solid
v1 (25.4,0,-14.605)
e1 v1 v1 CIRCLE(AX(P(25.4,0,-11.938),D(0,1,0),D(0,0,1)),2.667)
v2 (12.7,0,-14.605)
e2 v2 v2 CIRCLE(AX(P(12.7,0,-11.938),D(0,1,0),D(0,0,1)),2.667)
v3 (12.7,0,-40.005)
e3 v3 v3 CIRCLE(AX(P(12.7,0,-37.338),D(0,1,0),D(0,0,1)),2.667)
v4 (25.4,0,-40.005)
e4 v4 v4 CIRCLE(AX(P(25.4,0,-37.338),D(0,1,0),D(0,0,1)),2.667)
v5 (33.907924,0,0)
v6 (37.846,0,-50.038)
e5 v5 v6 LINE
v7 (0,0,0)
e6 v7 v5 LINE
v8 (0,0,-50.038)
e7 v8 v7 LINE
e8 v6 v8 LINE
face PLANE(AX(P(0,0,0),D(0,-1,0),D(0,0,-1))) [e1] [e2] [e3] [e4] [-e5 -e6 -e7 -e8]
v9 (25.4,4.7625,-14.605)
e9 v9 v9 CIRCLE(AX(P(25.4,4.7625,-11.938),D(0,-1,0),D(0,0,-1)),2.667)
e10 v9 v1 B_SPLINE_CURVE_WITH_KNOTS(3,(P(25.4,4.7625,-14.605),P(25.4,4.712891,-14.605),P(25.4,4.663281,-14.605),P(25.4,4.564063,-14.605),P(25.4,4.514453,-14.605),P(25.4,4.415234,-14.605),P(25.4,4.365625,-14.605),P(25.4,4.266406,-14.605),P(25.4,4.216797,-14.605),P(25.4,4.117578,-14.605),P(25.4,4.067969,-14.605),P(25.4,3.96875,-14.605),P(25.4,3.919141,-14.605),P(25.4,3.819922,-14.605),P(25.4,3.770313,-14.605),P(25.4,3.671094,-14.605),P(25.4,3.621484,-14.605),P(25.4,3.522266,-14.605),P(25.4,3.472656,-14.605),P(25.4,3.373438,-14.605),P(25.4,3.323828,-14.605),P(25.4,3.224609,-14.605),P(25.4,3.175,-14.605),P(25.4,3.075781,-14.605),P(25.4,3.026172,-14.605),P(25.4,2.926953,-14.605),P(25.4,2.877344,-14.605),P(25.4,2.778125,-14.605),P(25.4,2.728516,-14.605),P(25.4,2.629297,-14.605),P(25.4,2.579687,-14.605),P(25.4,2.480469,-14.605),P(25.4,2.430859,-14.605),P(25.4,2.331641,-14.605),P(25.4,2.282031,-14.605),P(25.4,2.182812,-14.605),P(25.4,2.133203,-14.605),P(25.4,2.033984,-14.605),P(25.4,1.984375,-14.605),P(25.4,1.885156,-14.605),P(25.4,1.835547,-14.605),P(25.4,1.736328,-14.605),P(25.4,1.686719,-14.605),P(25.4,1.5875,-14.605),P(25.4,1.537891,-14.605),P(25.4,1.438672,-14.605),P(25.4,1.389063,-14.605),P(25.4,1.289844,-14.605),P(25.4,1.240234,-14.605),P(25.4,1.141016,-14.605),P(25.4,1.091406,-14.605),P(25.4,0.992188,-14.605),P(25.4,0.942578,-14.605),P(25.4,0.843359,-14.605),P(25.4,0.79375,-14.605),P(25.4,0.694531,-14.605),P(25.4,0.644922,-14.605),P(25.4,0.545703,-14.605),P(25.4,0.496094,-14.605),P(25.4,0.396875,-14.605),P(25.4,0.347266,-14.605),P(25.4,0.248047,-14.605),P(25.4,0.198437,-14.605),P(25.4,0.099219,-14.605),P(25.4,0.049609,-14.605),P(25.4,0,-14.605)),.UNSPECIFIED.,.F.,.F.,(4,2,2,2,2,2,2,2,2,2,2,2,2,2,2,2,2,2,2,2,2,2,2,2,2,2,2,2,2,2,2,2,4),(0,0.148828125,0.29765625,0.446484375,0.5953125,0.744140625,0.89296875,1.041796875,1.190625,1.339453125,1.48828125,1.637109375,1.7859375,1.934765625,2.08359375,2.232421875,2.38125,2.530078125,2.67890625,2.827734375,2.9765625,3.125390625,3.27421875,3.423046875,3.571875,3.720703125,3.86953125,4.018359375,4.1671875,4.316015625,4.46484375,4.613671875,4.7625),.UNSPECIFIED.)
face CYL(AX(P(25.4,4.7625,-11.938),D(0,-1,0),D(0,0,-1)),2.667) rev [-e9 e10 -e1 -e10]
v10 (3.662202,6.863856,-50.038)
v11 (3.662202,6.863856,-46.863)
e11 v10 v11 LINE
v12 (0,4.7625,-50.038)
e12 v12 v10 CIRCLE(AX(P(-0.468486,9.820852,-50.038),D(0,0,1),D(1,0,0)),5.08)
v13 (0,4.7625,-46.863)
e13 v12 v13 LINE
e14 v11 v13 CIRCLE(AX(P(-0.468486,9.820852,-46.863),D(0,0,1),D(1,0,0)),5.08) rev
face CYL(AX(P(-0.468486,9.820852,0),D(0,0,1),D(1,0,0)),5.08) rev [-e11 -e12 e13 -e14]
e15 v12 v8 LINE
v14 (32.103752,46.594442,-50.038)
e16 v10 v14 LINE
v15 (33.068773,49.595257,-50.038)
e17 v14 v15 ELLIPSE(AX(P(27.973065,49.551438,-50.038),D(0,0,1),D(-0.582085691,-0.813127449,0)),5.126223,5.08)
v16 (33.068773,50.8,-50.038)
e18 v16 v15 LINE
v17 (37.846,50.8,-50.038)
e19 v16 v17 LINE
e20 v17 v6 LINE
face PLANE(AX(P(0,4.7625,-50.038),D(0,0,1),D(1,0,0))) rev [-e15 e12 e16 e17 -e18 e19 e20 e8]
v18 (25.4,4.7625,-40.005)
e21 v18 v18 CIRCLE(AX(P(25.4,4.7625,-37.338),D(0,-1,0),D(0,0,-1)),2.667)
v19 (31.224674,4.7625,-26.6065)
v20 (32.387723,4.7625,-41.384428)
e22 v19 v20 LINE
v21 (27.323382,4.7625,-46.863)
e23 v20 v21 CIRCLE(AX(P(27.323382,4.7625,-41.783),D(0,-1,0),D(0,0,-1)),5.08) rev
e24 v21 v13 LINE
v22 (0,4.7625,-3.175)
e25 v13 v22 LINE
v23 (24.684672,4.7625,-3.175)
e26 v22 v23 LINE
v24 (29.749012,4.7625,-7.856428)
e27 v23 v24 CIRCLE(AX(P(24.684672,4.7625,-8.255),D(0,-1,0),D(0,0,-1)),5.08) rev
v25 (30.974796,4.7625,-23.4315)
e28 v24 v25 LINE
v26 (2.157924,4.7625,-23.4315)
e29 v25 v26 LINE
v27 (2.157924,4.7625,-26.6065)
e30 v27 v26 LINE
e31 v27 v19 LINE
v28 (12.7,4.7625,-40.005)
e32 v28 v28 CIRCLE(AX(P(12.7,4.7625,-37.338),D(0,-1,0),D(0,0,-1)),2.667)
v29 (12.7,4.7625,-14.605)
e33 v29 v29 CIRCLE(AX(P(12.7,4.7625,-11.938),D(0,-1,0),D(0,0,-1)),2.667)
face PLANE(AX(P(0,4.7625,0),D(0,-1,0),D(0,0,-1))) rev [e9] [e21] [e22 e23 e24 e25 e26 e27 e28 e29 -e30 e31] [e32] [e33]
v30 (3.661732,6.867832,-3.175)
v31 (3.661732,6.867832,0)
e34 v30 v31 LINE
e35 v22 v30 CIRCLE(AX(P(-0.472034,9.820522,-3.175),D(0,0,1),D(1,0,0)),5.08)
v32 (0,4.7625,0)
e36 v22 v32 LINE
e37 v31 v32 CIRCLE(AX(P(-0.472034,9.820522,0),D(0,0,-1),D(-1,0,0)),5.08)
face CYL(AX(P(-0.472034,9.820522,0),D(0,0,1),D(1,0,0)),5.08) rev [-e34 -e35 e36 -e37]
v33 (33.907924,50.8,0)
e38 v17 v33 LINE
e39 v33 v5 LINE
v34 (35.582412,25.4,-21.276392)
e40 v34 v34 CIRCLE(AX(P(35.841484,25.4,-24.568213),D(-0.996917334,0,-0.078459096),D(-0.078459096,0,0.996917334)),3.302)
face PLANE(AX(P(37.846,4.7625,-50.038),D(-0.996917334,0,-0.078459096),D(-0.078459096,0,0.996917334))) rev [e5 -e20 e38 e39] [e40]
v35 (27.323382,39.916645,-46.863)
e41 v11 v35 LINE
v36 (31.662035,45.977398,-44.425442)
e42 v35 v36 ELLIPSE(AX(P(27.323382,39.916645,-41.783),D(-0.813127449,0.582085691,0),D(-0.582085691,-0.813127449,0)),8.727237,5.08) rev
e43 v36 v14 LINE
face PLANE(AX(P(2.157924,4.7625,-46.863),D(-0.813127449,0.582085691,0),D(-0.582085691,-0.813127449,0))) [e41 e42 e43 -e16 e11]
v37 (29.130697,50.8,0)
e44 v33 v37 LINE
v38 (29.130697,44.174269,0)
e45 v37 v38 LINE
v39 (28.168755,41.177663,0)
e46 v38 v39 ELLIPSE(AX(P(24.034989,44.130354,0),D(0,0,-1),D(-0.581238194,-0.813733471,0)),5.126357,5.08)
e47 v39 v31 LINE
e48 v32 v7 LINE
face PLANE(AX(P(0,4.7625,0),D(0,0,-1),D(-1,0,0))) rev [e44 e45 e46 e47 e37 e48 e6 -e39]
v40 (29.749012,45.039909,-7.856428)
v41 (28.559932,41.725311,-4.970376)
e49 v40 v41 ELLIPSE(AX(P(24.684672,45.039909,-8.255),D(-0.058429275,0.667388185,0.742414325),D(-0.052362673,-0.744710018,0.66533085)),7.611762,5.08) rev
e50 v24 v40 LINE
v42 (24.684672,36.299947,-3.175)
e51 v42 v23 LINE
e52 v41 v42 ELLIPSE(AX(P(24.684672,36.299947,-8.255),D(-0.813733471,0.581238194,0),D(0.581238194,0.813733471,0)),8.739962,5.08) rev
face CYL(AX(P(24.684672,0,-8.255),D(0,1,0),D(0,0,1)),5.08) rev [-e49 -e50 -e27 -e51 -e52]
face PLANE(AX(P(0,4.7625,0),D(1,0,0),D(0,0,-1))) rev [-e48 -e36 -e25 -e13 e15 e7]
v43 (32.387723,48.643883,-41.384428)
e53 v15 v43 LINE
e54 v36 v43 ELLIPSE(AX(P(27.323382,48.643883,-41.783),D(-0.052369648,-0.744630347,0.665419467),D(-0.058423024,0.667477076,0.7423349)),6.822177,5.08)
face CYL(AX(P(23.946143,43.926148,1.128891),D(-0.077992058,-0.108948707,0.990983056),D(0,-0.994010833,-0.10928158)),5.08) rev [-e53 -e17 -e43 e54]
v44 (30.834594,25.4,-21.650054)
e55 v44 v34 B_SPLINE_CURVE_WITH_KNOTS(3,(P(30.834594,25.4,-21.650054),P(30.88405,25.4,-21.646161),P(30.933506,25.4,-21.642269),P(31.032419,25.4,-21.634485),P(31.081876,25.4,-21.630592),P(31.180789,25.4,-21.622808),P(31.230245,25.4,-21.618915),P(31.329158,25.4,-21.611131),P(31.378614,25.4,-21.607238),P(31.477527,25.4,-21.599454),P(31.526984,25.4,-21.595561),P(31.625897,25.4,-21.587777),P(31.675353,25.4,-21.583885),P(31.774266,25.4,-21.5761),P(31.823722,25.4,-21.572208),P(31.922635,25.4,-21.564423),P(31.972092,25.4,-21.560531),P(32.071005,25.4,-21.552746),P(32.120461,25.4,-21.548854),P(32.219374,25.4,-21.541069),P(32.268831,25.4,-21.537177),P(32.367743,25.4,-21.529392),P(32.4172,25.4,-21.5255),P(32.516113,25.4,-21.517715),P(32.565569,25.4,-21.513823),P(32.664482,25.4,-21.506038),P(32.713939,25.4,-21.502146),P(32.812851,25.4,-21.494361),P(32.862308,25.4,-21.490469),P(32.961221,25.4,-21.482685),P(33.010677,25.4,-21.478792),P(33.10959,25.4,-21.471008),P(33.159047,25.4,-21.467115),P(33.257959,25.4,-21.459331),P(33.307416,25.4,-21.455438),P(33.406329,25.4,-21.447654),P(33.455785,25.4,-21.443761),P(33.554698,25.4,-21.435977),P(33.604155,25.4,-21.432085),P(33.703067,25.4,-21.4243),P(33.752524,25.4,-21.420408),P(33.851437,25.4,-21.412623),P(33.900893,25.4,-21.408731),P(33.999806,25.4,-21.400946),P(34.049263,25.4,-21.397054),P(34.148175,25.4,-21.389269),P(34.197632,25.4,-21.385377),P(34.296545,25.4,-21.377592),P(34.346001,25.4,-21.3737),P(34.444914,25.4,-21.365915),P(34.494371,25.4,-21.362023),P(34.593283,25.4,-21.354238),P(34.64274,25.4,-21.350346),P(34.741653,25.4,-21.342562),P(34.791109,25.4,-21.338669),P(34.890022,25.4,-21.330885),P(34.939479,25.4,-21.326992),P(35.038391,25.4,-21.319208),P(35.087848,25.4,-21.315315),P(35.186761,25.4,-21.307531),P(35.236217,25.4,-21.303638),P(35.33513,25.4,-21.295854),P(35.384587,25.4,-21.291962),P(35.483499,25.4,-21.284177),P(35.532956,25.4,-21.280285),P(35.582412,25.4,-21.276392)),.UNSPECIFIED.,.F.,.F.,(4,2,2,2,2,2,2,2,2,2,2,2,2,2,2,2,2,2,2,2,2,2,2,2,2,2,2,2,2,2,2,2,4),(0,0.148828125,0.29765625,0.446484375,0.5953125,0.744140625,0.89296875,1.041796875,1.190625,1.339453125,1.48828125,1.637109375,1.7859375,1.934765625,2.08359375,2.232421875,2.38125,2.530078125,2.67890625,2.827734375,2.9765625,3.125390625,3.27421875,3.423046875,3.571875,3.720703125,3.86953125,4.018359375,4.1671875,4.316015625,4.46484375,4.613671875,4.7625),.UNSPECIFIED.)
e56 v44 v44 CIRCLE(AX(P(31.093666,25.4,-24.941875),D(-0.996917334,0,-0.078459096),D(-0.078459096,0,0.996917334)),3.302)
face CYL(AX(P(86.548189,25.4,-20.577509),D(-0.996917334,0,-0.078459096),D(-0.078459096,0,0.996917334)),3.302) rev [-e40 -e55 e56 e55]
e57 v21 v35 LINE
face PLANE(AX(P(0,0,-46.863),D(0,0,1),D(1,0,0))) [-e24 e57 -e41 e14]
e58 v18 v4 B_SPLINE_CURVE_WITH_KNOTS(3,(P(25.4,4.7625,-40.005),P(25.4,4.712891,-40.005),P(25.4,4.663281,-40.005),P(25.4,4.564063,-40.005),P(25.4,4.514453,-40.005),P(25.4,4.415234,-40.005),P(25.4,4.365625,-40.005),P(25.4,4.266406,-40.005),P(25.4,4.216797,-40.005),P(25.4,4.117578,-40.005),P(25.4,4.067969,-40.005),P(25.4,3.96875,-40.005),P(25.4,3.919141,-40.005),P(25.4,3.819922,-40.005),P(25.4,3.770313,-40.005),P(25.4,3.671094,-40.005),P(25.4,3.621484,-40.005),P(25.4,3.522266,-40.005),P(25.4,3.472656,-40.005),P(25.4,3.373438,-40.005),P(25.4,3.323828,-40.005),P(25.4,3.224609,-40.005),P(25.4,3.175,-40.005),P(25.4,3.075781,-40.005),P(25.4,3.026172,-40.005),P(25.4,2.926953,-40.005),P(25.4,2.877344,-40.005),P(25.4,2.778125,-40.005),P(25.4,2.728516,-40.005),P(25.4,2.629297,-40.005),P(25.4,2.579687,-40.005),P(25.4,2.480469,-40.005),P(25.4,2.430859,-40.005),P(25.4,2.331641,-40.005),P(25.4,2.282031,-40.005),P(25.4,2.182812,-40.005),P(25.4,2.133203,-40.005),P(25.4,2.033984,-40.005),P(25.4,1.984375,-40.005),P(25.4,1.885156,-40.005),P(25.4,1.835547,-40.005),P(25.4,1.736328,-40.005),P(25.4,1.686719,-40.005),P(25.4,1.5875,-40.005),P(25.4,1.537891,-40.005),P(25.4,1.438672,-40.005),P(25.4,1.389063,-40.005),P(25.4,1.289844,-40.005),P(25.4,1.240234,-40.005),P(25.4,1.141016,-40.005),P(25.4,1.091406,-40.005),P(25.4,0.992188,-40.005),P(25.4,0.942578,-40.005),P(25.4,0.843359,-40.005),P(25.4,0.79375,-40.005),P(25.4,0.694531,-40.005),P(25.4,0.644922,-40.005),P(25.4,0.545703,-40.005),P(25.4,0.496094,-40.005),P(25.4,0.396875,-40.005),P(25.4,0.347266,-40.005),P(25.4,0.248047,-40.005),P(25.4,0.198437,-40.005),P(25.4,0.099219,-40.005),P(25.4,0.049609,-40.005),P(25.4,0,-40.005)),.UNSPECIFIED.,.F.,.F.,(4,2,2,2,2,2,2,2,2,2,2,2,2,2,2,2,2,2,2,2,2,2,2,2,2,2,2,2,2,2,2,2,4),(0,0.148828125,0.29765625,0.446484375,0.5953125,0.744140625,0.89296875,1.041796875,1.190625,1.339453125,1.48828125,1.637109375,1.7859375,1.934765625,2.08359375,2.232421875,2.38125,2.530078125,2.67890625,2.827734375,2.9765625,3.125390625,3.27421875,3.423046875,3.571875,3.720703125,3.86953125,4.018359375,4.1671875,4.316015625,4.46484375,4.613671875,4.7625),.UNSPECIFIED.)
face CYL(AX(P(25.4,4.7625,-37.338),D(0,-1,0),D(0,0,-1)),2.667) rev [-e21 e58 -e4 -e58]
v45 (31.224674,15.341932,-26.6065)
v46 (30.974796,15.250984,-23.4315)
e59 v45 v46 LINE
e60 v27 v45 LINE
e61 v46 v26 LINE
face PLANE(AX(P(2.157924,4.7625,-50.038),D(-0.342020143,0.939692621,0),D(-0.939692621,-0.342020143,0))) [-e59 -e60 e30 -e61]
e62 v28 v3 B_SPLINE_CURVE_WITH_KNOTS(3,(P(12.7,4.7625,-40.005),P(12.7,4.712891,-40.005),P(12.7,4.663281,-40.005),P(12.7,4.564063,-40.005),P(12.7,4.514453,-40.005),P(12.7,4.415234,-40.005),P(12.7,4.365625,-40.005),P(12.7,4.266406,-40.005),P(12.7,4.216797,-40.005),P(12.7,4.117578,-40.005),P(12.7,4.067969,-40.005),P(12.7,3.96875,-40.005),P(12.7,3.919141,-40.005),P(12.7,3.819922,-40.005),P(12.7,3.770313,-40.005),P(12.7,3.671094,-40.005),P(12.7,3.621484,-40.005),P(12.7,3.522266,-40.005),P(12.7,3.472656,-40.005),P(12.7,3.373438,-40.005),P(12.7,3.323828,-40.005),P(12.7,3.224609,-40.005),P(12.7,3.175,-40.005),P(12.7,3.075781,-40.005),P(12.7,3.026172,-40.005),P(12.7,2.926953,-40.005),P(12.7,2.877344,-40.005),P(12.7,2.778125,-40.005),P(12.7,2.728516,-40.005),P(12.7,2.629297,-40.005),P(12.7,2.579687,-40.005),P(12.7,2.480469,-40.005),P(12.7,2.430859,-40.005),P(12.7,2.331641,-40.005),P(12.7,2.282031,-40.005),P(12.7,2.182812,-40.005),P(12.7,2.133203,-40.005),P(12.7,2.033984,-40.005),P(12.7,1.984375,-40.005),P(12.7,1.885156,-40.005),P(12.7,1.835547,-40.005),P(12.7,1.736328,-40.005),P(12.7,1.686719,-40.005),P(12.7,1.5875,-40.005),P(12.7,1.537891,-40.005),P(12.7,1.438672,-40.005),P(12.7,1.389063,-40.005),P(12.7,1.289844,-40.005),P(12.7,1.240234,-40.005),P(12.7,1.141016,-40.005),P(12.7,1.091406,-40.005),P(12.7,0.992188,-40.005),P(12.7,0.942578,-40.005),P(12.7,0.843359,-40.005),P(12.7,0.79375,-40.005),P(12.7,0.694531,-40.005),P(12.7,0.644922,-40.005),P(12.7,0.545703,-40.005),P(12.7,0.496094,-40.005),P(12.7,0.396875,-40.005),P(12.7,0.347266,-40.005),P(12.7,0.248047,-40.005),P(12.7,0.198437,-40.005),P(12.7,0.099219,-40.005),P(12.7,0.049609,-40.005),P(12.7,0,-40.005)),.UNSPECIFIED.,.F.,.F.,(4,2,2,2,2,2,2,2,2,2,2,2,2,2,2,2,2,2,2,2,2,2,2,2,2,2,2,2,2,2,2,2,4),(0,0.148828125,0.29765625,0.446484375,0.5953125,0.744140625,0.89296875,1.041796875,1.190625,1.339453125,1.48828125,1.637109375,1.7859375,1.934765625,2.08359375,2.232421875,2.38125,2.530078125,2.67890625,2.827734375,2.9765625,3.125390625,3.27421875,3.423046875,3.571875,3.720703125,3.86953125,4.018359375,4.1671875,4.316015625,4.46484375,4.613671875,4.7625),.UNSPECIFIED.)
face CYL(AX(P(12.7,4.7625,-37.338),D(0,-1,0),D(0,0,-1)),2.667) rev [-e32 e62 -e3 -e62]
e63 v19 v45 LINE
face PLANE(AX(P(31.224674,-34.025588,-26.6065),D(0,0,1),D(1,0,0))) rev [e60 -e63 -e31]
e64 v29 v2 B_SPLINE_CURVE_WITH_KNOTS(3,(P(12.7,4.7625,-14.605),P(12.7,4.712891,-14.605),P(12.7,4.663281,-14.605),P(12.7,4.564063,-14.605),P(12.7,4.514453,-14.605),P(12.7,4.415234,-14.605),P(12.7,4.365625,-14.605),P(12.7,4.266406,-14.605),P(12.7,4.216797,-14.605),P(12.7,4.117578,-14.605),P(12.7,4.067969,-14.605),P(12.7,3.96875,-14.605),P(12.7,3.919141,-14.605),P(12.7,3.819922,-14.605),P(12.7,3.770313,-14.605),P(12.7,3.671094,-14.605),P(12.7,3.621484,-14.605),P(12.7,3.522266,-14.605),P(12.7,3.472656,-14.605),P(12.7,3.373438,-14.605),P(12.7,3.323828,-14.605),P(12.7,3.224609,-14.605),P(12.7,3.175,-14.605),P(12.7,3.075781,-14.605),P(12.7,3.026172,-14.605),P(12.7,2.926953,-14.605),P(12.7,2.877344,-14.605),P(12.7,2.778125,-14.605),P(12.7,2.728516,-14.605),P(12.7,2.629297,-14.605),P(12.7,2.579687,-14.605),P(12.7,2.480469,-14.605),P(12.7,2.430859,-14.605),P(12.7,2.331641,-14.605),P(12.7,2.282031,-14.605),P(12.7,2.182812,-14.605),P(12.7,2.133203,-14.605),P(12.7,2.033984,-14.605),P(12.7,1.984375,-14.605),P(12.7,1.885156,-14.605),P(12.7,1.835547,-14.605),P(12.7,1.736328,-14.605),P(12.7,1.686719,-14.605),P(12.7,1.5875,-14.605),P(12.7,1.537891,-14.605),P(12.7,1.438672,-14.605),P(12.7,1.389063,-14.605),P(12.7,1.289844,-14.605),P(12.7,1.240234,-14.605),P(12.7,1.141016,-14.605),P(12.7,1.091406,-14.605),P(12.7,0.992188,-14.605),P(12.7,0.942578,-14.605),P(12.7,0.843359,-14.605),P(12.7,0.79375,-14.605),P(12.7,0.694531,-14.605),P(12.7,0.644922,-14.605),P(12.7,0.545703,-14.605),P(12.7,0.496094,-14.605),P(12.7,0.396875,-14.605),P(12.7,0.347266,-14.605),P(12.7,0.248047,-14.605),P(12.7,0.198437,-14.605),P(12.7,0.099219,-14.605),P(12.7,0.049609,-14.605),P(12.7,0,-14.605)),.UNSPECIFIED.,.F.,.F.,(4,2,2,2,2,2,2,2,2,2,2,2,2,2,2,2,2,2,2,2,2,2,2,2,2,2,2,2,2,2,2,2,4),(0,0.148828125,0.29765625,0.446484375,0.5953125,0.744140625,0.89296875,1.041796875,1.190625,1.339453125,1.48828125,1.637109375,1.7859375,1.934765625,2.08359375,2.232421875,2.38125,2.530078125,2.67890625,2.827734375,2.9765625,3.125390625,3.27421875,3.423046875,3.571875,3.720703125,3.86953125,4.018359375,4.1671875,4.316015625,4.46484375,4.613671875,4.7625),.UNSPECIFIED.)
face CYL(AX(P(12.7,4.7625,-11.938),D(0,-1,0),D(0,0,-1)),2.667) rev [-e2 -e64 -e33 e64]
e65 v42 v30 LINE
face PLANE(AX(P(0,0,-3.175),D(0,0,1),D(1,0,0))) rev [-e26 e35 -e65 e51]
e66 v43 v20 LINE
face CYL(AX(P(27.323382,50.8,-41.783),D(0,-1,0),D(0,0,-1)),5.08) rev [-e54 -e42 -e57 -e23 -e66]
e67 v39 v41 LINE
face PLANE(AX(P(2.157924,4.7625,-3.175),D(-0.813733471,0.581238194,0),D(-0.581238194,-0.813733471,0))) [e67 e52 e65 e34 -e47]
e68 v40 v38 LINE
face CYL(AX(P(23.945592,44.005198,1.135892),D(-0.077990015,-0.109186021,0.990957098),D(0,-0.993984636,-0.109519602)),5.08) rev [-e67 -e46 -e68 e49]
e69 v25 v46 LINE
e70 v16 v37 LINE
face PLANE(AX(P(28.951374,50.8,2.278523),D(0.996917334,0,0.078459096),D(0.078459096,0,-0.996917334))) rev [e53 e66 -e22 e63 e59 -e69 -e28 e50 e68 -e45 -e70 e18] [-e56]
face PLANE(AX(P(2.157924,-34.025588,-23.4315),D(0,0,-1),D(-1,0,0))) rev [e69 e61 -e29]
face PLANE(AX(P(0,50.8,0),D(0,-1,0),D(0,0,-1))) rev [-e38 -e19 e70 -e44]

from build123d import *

# Parameters (mm, degrees)
SKETCH1_R           = 2.667
BOSS_EXTRUDE1_DEPTH = 4.7625
BOSS_EXTRUDE2_DEPTH = 50.8
SKETCH4_R           = 3.302
CUT_EXTRUDE1_DEPTH  = 55.626
BOSS_EXTRUDE3_DEPTH = 50.038
CUT_EXTRUDE5_DEPTH  = 46.0375
BOSS_EXTRUDE4_DEPTH = 3.175
BOSS_EXTRUDE5_DEPTH = 3.175
FILLET1_R           = 5.08
FILLET2_R           = 5.08


with BuildPart() as part:
    # Sketch1 → Boss-Extrude1 (new body)
    with BuildSketch(Plane(origin=(0, 0, 0), x_dir=(1, 0, 0), z_dir=(0, 1, 0))):
        Polygon((37.846, 50.038), (33.907923994, 0), (0, 0), (0, 50.038), align=None)
        with Locations(Location((12.7, 37.338, 0), (0, 0, 90))):
            Circle(SKETCH1_R, mode=Mode.SUBTRACT)
        with Locations(Location((25.4, 37.338, 0), (0, 0, 90))):
            Circle(SKETCH1_R, mode=Mode.SUBTRACT)
        with Locations(Location((12.7, 11.938, 0), (0, 0, 90))):
            Circle(SKETCH1_R, mode=Mode.SUBTRACT)
        with Locations(Location((25.4, 11.938, 0), (0, 0, 90))):
            Circle(SKETCH1_R, mode=Mode.SUBTRACT)
    extrude(amount=BOSS_EXTRUDE1_DEPTH)

    # Sketch2 → Boss-Extrude2 (add)
    with BuildSketch(Plane.XZ):
        Polygon((29.2288268, -1.246852262), (33.068773405, -50.038), (37.846, -50.038), (33.907923994, 0), (29.130697399, 0), (29.160105192, -0.373661443), align=None)
    extrude(amount=-BOSS_EXTRUDE2_DEPTH)

    # Sketch4 → Cut-Extrude1 (cut)
    with BuildSketch(Plane(origin=(28.951373786, 0, 2.278522532), x_dir=(-0.07845909572784877, 0, 0.9969173337331276), z_dir=(-0.9969173337331276, 0, -0.07845909572784877))):
        with Locations((-27.304568176, 25.4)):
            Circle(SKETCH4_R)
    extrude(amount=-CUT_EXTRUDE1_DEPTH, mode=Mode.SUBTRACT)

    # Sketch5 → Boss-Extrude3 (add)
    with BuildSketch(Plane.XY):
        Polygon((2.157923994, 4.7625), (33.907923994, 16.318554938), (33.907923994, 4.7625), align=None)
    extrude(amount=-BOSS_EXTRUDE3_DEPTH)

    # Sketch7 → Cut-Extrude5 (cut)
    with BuildSketch(Plane(origin=(0, 50.8, 0), x_dir=(1, 0, 0), z_dir=(0, 1, 0))):
        Polygon((33.068773405, 50.038), (31.224674361, 26.6065), (2.157923994, 26.6065), (2.157923994, 50.038), align=None)
        Polygon((2.157923994, 23.4315), (30.974796442, 23.4315), (29.130697399, 0), (2.157923994, 0), align=None)
    extrude(amount=-CUT_EXTRUDE5_DEPTH, mode=Mode.SUBTRACT)

    # Sketch8 → Boss-Extrude4 (add)
    with BuildSketch(Plane.XY):
        Polygon((2.157923994, 4.7625), (33.907923994, 49.2125), (33.907923994, 4.7625), align=None)
    extrude(amount=-BOSS_EXTRUDE4_DEPTH)

    # Sketch9 → Boss-Extrude5 (add)
    with BuildSketch(Plane(origin=(0, 0, -50.038), x_dir=(-1, 0, 0), z_dir=(0, 0, -1))):
        Polygon((-2.157923994, 4.7625), (-33.068773405, 47.9425), (-33.068773405, 4.7625), align=None)
    extrude(amount=-BOSS_EXTRUDE5_DEPTH)

    # Fillet1
    # the kernel refuses this fillet: 5.08 mm, written as the material it adds along each edge
    with BuildSketch(Plane(origin=(2.157923994, 4.7625, 0), x_dir=(-1, 0, 0), z_dir=(0, 0, -1))) as fillet1_piece_1:
        with BuildLine():
            CenterArc((2.629957643, 5.058021771), FILLET1_R, 215.537677792, 49.130706658)
            Line((-1.503808391, 2.105331747), (-1.586483711, 2.046277946))
            Line((-1.586483711, 2.046277946), (-0.082675321, -0.0590538))
            Line((-0.082675321, -0.0590538), (0, -0.1016))
            ThreePointArc((0, -0.1016), (1.078961997, -0.1016), (2.148483321, -0.101160435))
            Line((2.148483321, -0.101160435), (2.157923994, 0))
        make_face()
    extrude(amount=3.175)
    with BuildSketch(Plane(origin=(2.157923994, 4.7625, -50.038), x_dir=(-1, 0, 0), z_dir=(0, 0, 1))) as fillet1_piece_2:
        with BuildLine():
            CenterArc((2.626409807, -5.058351613), FILLET1_R, 95.291428018, 49.111198854)
            Line((-1.504277635, -2.101356304), (-1.586891383, -2.042216397))
            Line((-1.586891383, -2.042216397), (-0.082613749, 0.059139906))
            Line((-0.082613749, 0.059139906), (0, 0.1016))
            ThreePointArc((0, 0.1016), (1.078961997, 0.1016), (2.148554278, 0.101167032))
            Line((2.148554278, 0.101167032), (2.157923994, 0))
        make_face()
    extrude(amount=3.175)
    with BuildSketch(Plane(origin=(29.700338722, 43.32188062, -7.237979285), x_dir=(-0.008566636475351457, 0.9940213341844409, 0.10884943695620641), z_dir=(-0.07799001501429913, -0.10918602102001876, 0.9909570981489993))) as fillet1_piece_3_section:
        with BuildLine():
            CenterArc((FILLET1_R * 0.322839030398, FILLET1_R), FILLET1_R, 234.215790713, 35.784209287)
            Line((-FILLET1_R * 0.261895093237, FILLET1_R * 0.188774997515), (-FILLET1_R * 0.27358977571, FILLET1_R * 0.172550497465))
            Line((-FILLET1_R * 0.27358977571, FILLET1_R * 0.172550497465), (-FILLET1_R * 0.00645678060796, -FILLET1_R * 0.02))
            Line((-FILLET1_R * 0.00645678060796, -FILLET1_R * 0.02), (FILLET1_R * 0.322839030398, -FILLET1_R * 0.02))
            Line((FILLET1_R * 0.322839030398, -FILLET1_R * 0.02), (FILLET1_R * 0.322839030398, 0))
        make_face()
    fillet1_piece_3 = extrude(amount=11.404084587, mode=Mode.PRIVATE)
    fillet1_piece_3 = split(fillet1_piece_3, bisect_by=Plane(origin=(29.0621266, 42.760284123, 0), z_dir=(0, 0, -1)), keep=Keep.TOP, mode=Mode.PRIVATE)
    fillet1_piece_3 = split(fillet1_piece_3, bisect_by=Plane(origin=(29.0621266, 42.760284123, -3.175), z_dir=(0, 0, 1)), keep=Keep.TOP, mode=Mode.PRIVATE)
    add(fillet1_piece_3)
    with BuildSketch(Plane(origin=(32.498558986, 47.145955774, -42.792738849), x_dir=(-0.008548017001345628, 0.994047372778579, 0.1086128541073727), z_dir=(0.07799205797884924, 0.10894870661005905, -0.9909830564748416))) as fillet1_piece_4_section:
        with BuildLine():
            CenterArc((FILLET1_R * 0.32340916623, -FILLET1_R), FILLET1_R, 90, 35.843365579)
            Line((-FILLET1_R * 0.262162212759, -FILLET1_R * 0.189379151447), (-FILLET1_R * 0.273873640339, -FILLET1_R * 0.173166734476))
            Line((-FILLET1_R * 0.273873640339, -FILLET1_R * 0.173166734476), (-FILLET1_R * 0.0064681833246, FILLET1_R * 0.02))
            Line((-FILLET1_R * 0.0064681833246, FILLET1_R * 0.02), (FILLET1_R * 0.32340916623, FILLET1_R * 0.02))
            Line((FILLET1_R * 0.32340916623, FILLET1_R * 0.02), (FILLET1_R * 0.32340916623, 0))
        make_face()
    fillet1_piece_4 = extrude(amount=11.418482111, mode=Mode.PRIVATE)
    fillet1_piece_4 = split(fillet1_piece_4, bisect_by=Plane(origin=(32.749606974, 47.829296301, -50.038), z_dir=(0, 0, 1)), keep=Keep.TOP, mode=Mode.PRIVATE)
    fillet1_piece_4 = split(fillet1_piece_4, bisect_by=Plane(origin=(32.749606974, 47.829296301, -46.863), z_dir=(0, 0, -1)), keep=Keep.TOP, mode=Mode.PRIVATE)
    add(fillet1_piece_4)

    # Fillet2
    fillet2_edges = [part.edges().sort_by_distance(p)[0] for p in [
        (32.818895486, 27.004348608, -46.863),
        (29.380575318, 24.643299124, -3.175),
    ]]
    fillet(fillet2_edges, radius=FILLET2_R)


solid = part.part
